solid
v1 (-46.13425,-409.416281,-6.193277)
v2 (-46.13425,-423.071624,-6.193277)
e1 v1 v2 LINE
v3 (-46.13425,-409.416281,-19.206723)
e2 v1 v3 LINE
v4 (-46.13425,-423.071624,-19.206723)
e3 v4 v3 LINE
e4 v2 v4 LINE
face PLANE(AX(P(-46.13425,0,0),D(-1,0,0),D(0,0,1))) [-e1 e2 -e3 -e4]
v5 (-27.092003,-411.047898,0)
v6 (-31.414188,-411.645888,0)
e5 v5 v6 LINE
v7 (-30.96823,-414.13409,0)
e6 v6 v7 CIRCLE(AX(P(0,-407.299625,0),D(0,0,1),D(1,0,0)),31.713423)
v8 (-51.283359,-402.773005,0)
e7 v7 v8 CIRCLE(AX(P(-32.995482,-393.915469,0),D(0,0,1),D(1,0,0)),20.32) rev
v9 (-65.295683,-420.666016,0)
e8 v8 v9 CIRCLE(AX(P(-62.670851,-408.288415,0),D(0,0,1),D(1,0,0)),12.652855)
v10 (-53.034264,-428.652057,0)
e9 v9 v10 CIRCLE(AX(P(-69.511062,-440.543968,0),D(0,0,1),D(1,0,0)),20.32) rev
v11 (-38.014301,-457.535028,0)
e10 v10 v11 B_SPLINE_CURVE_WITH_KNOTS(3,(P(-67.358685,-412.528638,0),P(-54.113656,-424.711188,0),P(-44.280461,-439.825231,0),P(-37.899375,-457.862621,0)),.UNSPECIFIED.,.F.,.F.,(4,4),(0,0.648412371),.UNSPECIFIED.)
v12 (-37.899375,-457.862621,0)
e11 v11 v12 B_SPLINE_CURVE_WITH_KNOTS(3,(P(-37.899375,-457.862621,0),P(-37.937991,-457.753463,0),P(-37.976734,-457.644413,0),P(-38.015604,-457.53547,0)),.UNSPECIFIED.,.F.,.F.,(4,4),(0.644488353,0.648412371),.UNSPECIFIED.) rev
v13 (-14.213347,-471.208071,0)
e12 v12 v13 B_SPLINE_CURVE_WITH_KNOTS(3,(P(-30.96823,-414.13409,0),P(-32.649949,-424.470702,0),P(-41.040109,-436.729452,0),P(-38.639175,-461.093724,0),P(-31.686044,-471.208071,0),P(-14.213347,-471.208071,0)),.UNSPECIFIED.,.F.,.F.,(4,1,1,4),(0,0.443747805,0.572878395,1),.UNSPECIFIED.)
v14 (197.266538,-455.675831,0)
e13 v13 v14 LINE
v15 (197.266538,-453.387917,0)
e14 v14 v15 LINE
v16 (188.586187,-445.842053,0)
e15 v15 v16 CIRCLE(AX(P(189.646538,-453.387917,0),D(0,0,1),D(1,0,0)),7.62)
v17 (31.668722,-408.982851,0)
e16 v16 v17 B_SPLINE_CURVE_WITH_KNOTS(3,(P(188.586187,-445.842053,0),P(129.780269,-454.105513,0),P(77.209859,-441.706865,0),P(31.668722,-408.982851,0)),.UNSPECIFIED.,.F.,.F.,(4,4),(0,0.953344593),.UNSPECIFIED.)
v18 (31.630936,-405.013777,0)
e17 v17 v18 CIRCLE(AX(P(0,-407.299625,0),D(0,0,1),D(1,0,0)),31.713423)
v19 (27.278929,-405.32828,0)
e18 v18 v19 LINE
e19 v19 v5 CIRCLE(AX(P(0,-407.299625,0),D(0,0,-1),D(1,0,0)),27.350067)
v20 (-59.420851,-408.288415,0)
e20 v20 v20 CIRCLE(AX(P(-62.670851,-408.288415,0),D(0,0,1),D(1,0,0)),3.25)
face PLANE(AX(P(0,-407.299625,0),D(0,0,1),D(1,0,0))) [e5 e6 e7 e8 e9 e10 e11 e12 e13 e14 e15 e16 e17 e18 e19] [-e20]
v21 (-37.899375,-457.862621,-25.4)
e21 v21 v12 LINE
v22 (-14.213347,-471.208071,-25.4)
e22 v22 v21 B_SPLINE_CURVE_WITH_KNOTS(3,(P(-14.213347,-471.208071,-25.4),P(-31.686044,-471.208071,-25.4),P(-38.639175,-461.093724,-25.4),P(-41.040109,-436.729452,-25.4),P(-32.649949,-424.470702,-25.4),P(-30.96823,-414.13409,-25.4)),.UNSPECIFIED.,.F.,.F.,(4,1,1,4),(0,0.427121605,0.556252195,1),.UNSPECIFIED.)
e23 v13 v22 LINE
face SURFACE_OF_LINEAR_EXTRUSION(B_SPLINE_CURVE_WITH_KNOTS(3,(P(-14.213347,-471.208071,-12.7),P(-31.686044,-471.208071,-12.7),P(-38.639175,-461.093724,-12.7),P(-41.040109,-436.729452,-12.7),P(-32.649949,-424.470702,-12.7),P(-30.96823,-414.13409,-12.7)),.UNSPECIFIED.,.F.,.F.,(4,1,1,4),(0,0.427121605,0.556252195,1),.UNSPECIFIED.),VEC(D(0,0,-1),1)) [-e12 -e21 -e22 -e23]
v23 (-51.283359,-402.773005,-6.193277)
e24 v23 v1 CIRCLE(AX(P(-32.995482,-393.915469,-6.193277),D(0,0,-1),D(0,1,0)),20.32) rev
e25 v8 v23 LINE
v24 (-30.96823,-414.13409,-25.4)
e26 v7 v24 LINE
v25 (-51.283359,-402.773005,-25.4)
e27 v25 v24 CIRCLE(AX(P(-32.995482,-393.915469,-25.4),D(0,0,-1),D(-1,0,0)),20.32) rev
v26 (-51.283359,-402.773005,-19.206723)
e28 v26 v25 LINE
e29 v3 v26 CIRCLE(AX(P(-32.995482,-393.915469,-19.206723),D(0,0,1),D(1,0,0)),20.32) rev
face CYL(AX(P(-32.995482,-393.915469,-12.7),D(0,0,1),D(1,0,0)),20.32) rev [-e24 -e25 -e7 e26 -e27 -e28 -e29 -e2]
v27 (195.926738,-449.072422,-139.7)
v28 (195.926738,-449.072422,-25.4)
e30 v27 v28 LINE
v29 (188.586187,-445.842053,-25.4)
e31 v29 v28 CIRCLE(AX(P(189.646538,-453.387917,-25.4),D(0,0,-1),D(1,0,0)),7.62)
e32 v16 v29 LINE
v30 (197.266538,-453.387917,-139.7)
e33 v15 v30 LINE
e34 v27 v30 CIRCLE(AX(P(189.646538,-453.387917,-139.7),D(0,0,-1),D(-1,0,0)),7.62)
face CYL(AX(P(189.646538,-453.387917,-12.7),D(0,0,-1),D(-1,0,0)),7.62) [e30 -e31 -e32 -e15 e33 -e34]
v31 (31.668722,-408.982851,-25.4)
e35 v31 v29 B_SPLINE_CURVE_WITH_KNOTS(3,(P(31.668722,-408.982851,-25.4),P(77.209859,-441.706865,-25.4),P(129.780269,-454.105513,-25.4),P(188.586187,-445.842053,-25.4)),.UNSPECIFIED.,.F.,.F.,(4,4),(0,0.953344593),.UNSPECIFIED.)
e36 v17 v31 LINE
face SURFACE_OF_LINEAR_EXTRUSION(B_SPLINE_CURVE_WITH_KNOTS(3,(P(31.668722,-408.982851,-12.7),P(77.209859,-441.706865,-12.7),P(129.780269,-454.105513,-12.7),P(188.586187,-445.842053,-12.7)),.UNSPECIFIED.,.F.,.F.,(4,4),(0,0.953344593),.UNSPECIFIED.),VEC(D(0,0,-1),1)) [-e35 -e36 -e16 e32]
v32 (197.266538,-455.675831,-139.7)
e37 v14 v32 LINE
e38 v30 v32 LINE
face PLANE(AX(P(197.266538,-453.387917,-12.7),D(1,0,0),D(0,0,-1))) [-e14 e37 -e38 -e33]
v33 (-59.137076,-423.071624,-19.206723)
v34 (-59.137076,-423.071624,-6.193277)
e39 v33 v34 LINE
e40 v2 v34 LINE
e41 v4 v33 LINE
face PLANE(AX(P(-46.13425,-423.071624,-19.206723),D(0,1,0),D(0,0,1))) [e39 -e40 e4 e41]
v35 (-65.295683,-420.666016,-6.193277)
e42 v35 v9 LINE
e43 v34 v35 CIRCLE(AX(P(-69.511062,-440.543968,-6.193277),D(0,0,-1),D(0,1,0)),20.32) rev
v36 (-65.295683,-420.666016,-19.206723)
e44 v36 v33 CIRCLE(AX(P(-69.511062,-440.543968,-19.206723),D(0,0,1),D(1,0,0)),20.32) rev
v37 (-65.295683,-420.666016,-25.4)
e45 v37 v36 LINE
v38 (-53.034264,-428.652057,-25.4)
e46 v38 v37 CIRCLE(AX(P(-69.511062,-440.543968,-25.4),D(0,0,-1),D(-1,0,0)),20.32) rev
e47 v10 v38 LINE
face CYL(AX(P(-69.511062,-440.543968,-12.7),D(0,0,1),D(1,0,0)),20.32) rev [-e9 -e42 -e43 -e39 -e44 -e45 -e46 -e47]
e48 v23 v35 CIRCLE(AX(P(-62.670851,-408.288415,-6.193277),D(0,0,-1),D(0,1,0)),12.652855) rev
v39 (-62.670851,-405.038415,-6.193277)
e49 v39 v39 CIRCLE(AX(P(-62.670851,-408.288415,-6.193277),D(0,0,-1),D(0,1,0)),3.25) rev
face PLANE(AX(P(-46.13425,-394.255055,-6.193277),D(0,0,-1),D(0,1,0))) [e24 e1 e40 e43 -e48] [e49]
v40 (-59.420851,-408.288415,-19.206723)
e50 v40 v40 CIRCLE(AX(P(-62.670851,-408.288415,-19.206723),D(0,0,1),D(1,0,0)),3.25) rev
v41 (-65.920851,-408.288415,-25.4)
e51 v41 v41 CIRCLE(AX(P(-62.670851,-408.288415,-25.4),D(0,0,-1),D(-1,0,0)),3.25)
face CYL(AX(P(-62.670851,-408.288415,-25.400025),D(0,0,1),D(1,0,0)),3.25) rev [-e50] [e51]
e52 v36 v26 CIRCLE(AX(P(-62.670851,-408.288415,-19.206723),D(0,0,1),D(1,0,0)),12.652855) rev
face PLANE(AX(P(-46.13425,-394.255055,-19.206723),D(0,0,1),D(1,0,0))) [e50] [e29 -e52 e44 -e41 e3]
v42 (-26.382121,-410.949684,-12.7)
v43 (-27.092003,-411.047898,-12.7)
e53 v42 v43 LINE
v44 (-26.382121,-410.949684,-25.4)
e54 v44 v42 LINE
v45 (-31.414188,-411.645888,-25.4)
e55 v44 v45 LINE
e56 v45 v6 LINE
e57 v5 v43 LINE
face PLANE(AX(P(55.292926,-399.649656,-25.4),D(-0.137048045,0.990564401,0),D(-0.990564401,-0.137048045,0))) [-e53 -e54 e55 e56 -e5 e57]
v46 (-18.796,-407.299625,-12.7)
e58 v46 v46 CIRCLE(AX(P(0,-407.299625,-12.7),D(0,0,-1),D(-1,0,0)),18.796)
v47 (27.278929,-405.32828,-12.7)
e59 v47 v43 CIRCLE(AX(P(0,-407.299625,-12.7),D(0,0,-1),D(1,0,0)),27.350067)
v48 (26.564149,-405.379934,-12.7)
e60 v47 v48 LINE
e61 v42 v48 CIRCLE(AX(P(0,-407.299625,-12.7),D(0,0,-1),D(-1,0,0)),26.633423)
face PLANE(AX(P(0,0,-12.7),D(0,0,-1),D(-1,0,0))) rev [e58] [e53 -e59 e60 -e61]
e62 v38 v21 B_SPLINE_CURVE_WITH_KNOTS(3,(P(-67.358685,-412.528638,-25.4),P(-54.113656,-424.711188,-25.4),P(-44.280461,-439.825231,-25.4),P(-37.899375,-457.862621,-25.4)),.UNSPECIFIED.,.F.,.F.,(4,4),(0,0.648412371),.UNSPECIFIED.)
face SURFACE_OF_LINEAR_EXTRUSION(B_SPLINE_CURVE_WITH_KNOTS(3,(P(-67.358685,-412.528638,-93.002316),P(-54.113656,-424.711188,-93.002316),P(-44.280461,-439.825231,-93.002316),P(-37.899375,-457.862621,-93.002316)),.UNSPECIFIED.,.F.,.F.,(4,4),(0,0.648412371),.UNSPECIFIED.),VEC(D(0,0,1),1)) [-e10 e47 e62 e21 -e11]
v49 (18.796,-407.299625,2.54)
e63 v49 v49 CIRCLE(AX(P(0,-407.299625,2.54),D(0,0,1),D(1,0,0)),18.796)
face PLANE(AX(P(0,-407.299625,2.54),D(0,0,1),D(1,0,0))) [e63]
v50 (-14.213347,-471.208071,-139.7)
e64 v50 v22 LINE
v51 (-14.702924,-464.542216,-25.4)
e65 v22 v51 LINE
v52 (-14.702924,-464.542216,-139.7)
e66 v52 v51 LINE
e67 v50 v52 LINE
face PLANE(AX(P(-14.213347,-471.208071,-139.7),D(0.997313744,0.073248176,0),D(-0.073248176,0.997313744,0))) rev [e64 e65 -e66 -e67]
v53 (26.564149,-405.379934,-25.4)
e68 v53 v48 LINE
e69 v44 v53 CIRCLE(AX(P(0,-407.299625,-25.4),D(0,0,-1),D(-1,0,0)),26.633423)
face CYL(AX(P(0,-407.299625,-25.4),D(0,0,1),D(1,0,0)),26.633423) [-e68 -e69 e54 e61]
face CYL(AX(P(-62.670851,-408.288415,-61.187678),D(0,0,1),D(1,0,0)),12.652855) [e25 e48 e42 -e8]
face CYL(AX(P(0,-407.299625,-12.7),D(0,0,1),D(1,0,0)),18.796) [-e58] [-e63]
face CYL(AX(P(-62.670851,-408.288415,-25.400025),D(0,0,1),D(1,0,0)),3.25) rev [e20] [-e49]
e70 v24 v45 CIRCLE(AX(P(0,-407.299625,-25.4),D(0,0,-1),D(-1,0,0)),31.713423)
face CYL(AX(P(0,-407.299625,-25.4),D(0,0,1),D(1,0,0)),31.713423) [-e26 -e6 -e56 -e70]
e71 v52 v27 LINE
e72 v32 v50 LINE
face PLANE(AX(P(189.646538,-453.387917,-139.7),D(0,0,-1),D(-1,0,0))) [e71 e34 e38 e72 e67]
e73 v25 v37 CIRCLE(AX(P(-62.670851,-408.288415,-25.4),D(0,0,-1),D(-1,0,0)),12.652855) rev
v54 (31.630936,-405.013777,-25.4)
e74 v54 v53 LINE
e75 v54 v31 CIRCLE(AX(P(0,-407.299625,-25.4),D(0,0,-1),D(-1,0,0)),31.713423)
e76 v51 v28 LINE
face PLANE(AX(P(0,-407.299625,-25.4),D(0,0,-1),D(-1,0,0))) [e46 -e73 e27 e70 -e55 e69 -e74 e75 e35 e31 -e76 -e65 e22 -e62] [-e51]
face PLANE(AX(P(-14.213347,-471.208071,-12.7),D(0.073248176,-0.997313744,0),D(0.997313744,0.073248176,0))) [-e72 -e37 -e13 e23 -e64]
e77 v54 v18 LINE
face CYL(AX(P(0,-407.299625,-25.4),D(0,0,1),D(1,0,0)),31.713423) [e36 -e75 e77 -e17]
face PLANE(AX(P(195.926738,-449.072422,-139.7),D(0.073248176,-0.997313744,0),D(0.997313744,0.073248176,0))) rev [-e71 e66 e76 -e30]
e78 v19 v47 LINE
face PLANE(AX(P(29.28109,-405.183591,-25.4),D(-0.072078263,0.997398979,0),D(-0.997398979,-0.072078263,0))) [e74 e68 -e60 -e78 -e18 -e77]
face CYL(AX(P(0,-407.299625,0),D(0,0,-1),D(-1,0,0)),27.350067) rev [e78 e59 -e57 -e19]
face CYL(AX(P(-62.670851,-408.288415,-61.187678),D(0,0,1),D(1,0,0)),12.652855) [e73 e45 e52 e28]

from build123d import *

# Parameters (mm, degrees)
BOSS_EXTRUDE1_DEPTH      = 2.54
BOSS_EXTRUDE1_DEPTH_BACK = 12.7
SKETCH1_R                = 18.796
SKETCH2_R                = 18.796
BOSS_EXTRUDE2_DEPTH      = 12.7
BOSS_EXTRUDE3_DEPTH      = 12.7
BOSS_EXTRUDE5_DEPTH      = 12.7
BOSS_EXTRUDE6_DEPTH      = 12.7
SKETCH7_R                = 18.796
BOSS_EXTRUDE7_DEPTH      = 12.7
BOSS_EXTRUDE8_DEPTH      = 25.4
SKETCH11_R               = 12.652854813
BOSS_EXTRUDE10_DEPTH     = 25.4
SKETCH12_R               = 3.250000001
CUT_EXTRUDE2_DEPTH       = 512.464850261
FILLET1_R                = 20.32
BOSS_EXTRUDE11_START     = 114.3
BOSS_EXTRUDE11_DEPTH     = 114.3
SKETCH16_W               = 13.01344698
SKETCH16_H               = 28.816569003
CUT_EXTRUDE4_DEPTH       = 54.61


with BuildPart() as part:
    # Sketch1 → Boss-Extrude1 (new, two sides: drawn at the far end of the back side and taken through both)
    with BuildSketch(Plane.XY.offset(-BOSS_EXTRUDE1_DEPTH_BACK)):
        with Locations((0, -407.299625141)):
            Circle(SKETCH1_R)
    extrude(amount=BOSS_EXTRUDE1_DEPTH + BOSS_EXTRUDE1_DEPTH_BACK)



with BuildPart() as body_2:
    # Sketch2 → Boss-Extrude2 (new body)
    with BuildSketch(Plane(origin=(0, 0, -12.7), x_dir=(-1, 0, 0), z_dir=(0, 0, -1))):
        with BuildLine():
            Line((-26.564149005, -405.379934257), (-31.63093582, -405.013776678))
            ThreePointArc((-31.63093582, -405.013776678), (-3.317825996, -438.839016934), (31.414187958, -411.645887785))
            Line((31.414187958, -411.645887785), (26.382120799, -410.949683715))
            ThreePointArc((26.382120799, -410.949683715), (2.786361575, -380.812356225), (-26.564149005, -405.379934257))
        make_face()
        with Locations(Location((0, -407.299625141, 0), (0, 0, 180))):
            Circle(SKETCH2_R, mode=Mode.SUBTRACT)
    extrude(amount=BOSS_EXTRUDE2_DEPTH)

    # Sketch3 → Boss-Extrude3 (add)
    with BuildSketch(Plane(origin=(0, 0, -25.4), x_dir=(-1, 0, 0), z_dir=(0, 0, -1))):
        with BuildLine():
            Line((14.213346722, -471.208070579), (-197.266538305, -455.67583119))
            Line((-197.266538305, -455.67583119), (-197.266538305, -453.387916788))
            ThreePointArc((-197.266538305, -453.387916788), (-194.645764338, -447.637078669), (-188.586186842, -445.842053367))
            add(Edge.make_bspline(
                [(-31.668722049, -408.98285055), (-77.209858947, -441.706865094), (-129.780268895, -454.105513447), (-188.586186842, -445.842053367)],
                knots=[0, 0, 0, 0, 0.953344593, 0.953344593, 0.953344593, 0.953344593], degree=3))
            ThreePointArc((-31.668722049, -408.98285055), (-2.599324763, -438.906344597), (30.96823039, -414.134090044))
            add(Edge.make_bspline(
                [(30.96823039, -414.134090044), (32.649949124, -424.470701531), (41.040109499, -436.729451805), (38.639174938, -461.09372409), (31.686044055, -471.208070579), (14.213346722, -471.208070579)],
                knots=[0, 0, 0, 0, 0.443747805, 0.572878395, 1, 1, 1, 1], degree=3))
        make_face()
    extrude(amount=-BOSS_EXTRUDE3_DEPTH)

    # Sketch5 → Boss-Extrude5 (add)
    with BuildSketch(Plane.XY.offset(-12.7)):
        with BuildLine():
            Line((31.63093582, -405.013776678), (27.278929363, -405.328279775))
            ThreePointArc((27.278929363, -405.328279775), (2.861336178, -434.499605748), (-27.092003196, -411.047898425))
            Line((-27.092003196, -411.047898425), (-31.414187958, -411.645887785))
            ThreePointArc((-31.414187958, -411.645887785), (3.317825996, -438.839016934), (31.63093582, -405.013776678))
        make_face()
    extrude(amount=BOSS_EXTRUDE5_DEPTH)

    # Sketch6 → Boss-Extrude6 (add)
    with BuildSketch(Plane.XY.offset(-12.7)):
        with BuildLine():
            Line((-14.213346722, -471.208070579), (197.266538305, -455.67583119))
            Line((197.266538305, -455.67583119), (197.266538305, -453.387916788))
            ThreePointArc((197.266538305, -453.387916788), (194.645764338, -447.637078669), (188.586186842, -445.842053367))
            add(Edge.make_bspline(
                [(188.586186842, -445.842053367), (129.780268895, -454.105513447), (77.209858947, -441.706865094), (31.668722049, -408.98285055)],
                knots=[0, 0, 0, 0, 0.953344593, 0.953344593, 0.953344593, 0.953344593], degree=3))
            ThreePointArc((31.668722049, -408.98285055), (2.599324763, -438.906344597), (-30.96823039, -414.134090044))
            add(Edge.make_bspline(
                [(-30.96823039, -414.134090044), (-32.649949124, -424.470701531), (-41.040109499, -436.729451805), (-38.639174938, -461.09372409), (-31.686044055, -471.208070579), (-14.213346722, -471.208070579)],
                knots=[0, 0, 0, 0, 0.443747805, 0.572878395, 1, 1, 1, 1], degree=3))
        make_face()
    extrude(amount=BOSS_EXTRUDE6_DEPTH)


with BuildPart() as part_1:
    add(part.part)

    add(body_2.part)  # Boss-Extrude7 merges body 2
    # Sketch7 → Boss-Extrude7 (add)
    with BuildSketch(Plane(origin=(0, 0, -12.7), x_dir=(-1, 0, 0), z_dir=(0, 0, -1))):
        with Locations(Location((0, -407.299625141, 0), (0, 0, 180))):
            Circle(SKETCH7_R)
    extrude(amount=BOSS_EXTRUDE7_DEPTH)

    # Sketch8 → Boss-Extrude8 (add)
    with BuildSketch(Plane.XY):
        with BuildLine():
            ThreePointArc((-58.391711784, -403.636078411), (-67.121824198, -403.800195984), (-67.358685042, -412.528637671))
            add(Edge.make_bspline(
                [(-37.899374688, -457.862620823), (-44.280461027, -439.825230998), (-54.11365555, -424.711188181), (-67.358685042, -412.528637671)],
                knots=[0, 0, 0, 0, 0.648412371, 0.648412371, 0.648412371, 0.648412371], degree=3))
            add(Edge.make_bspline(
                [(-30.96823039, -414.134090044), (-32.649949124, -424.470701531), (-41.040109499, -436.729451805), (-39.512215319, -452.234259992), (-38.376068735, -456.515151772), (-37.899374688, -457.862620823)],
                knots=[0, 0, 0, 0, 0.443747805, 0.572878395, 0.636374771, 0.636374771, 0.636374771, 0.636374771], degree=3))
            add(Edge.make_bspline(
                [(-30.96823039, -414.134090044), (-41.722283963, -415.45839081), (-50.863444428, -411.959053599), (-58.391711784, -403.636078411)],
                knots=[0, 0, 0, 0, 0.680532916, 0.680532916, 0.680532916, 0.680532916], degree=3))
        make_face()
    extrude(amount=-BOSS_EXTRUDE8_DEPTH)

    # Sketch11 → Boss-Extrude10 (add)
    with BuildSketch(Plane.XY):
        with Locations((-62.670851235, -408.28841522)):
            Circle(SKETCH11_R)
    extrude(amount=-BOSS_EXTRUDE10_DEPTH)

    # Sketch12 → Cut-Extrude2 (cut, through all)
    with BuildSketch(Plane.XY):
        with Locations((-62.670851235, -408.28841522)):
            Circle(SKETCH12_R)
    extrude(amount=-CUT_EXTRUDE2_DEPTH, mode=Mode.SUBTRACT)

    # Fillet1
    # the kernel refuses this fillet: 20.32 mm, written as the material it adds along each edge
    with BuildSketch(Plane(origin=(-59.511042023, -420.540367745, -25.4), x_dir=(-0.9997641834800511, -0.021715833635081266, 0), z_dir=(0, 0, 1))) as fillet1_piece_1:
        with BuildLine():
            CenterArc((10.432056933, 19.781724025), FILLET1_R, 214.575044889, 42.207687895)
            Line((-6.299098106, 8.250425267), (-6.633721207, 8.019799292))
            ThreePointArc((-6.633721207, 8.019799292), (-3.573104641, 3.801857042), (-0.310609577, -0.26207375))
            Line((-0.310609577, -0.26207375), (0.09292103, -0.395634481))
            ThreePointArc((0.09292103, -0.395634481), (2.893002714, -0.07122639), (5.693084398, -0.395634481))
            Line((5.693084398, -0.395634481), (5.786005428, 0))
        make_face()
    extrude(amount=25.4)
    with BuildSketch(Plane(origin=(-50.199792551, -410.425569918, -25.4), x_dir=(0.981910282713407, -0.18934676311381016, 0), z_dir=(0, 0, 1))) as fillet1_piece_2:
        with BuildLine():
            CenterArc((13.766955548, 19.469018818), FILLET1_R, 216.757393509, 69.882984253)
            Line((-2.512952914, 7.308962056), (-2.838551084, 7.065760921))
            ThreePointArc((-2.838551084, 7.065760921), (-1.069058095, 3.718918839), (-0.406312291, -0.008442875))
            Line((-0.406312291, -0.008442875), (-0.135668955, -0.383086015))
            ThreePointArc((-0.135668955, -0.383086015), (9.809532931, -2.061533892), (19.702243107, -0.389380376))
            Line((19.702243107, -0.389380376), (19.58586492, 0))
        make_face()
    extrude(amount=25.4)

    # Sketch15 → Boss-Extrude11 (add)
    with BuildSketch(Plane(origin=(0, 0, -25.4), x_dir=(-1, 0, 0), z_dir=(0, 0, -1)).offset(BOSS_EXTRUDE11_START)):
        with BuildLine():
            Line((-197.266538305, -455.67583119), (14.213346722, -471.208070579))
            Line((14.213346722, -471.208070579), (14.702923537, -464.542216029))
            Line((14.702923537, -464.542216029), (-195.926737542, -449.072421737))
            ThreePointArc((-195.926737542, -449.072421737), (-196.923883913, -451.12857155), (-197.266538305, -453.387916788))
            Line((-197.266538305, -453.387916788), (-197.266538305, -455.67583119))
        make_face()
    extrude(amount=-BOSS_EXTRUDE11_DEPTH)

    # Sketch16 → Cut-Extrude4 (cut)
    with BuildSketch(Plane(origin=(-100.744249605, 0, 0), x_dir=(0, 0, -1), z_dir=(1, 0, 0))):
        with Locations((12.7, -408.663339092)):
            Rectangle(SKETCH16_W, SKETCH16_H)
    extrude(amount=CUT_EXTRUDE4_DEPTH, mode=Mode.SUBTRACT)


solid = part_1.part
